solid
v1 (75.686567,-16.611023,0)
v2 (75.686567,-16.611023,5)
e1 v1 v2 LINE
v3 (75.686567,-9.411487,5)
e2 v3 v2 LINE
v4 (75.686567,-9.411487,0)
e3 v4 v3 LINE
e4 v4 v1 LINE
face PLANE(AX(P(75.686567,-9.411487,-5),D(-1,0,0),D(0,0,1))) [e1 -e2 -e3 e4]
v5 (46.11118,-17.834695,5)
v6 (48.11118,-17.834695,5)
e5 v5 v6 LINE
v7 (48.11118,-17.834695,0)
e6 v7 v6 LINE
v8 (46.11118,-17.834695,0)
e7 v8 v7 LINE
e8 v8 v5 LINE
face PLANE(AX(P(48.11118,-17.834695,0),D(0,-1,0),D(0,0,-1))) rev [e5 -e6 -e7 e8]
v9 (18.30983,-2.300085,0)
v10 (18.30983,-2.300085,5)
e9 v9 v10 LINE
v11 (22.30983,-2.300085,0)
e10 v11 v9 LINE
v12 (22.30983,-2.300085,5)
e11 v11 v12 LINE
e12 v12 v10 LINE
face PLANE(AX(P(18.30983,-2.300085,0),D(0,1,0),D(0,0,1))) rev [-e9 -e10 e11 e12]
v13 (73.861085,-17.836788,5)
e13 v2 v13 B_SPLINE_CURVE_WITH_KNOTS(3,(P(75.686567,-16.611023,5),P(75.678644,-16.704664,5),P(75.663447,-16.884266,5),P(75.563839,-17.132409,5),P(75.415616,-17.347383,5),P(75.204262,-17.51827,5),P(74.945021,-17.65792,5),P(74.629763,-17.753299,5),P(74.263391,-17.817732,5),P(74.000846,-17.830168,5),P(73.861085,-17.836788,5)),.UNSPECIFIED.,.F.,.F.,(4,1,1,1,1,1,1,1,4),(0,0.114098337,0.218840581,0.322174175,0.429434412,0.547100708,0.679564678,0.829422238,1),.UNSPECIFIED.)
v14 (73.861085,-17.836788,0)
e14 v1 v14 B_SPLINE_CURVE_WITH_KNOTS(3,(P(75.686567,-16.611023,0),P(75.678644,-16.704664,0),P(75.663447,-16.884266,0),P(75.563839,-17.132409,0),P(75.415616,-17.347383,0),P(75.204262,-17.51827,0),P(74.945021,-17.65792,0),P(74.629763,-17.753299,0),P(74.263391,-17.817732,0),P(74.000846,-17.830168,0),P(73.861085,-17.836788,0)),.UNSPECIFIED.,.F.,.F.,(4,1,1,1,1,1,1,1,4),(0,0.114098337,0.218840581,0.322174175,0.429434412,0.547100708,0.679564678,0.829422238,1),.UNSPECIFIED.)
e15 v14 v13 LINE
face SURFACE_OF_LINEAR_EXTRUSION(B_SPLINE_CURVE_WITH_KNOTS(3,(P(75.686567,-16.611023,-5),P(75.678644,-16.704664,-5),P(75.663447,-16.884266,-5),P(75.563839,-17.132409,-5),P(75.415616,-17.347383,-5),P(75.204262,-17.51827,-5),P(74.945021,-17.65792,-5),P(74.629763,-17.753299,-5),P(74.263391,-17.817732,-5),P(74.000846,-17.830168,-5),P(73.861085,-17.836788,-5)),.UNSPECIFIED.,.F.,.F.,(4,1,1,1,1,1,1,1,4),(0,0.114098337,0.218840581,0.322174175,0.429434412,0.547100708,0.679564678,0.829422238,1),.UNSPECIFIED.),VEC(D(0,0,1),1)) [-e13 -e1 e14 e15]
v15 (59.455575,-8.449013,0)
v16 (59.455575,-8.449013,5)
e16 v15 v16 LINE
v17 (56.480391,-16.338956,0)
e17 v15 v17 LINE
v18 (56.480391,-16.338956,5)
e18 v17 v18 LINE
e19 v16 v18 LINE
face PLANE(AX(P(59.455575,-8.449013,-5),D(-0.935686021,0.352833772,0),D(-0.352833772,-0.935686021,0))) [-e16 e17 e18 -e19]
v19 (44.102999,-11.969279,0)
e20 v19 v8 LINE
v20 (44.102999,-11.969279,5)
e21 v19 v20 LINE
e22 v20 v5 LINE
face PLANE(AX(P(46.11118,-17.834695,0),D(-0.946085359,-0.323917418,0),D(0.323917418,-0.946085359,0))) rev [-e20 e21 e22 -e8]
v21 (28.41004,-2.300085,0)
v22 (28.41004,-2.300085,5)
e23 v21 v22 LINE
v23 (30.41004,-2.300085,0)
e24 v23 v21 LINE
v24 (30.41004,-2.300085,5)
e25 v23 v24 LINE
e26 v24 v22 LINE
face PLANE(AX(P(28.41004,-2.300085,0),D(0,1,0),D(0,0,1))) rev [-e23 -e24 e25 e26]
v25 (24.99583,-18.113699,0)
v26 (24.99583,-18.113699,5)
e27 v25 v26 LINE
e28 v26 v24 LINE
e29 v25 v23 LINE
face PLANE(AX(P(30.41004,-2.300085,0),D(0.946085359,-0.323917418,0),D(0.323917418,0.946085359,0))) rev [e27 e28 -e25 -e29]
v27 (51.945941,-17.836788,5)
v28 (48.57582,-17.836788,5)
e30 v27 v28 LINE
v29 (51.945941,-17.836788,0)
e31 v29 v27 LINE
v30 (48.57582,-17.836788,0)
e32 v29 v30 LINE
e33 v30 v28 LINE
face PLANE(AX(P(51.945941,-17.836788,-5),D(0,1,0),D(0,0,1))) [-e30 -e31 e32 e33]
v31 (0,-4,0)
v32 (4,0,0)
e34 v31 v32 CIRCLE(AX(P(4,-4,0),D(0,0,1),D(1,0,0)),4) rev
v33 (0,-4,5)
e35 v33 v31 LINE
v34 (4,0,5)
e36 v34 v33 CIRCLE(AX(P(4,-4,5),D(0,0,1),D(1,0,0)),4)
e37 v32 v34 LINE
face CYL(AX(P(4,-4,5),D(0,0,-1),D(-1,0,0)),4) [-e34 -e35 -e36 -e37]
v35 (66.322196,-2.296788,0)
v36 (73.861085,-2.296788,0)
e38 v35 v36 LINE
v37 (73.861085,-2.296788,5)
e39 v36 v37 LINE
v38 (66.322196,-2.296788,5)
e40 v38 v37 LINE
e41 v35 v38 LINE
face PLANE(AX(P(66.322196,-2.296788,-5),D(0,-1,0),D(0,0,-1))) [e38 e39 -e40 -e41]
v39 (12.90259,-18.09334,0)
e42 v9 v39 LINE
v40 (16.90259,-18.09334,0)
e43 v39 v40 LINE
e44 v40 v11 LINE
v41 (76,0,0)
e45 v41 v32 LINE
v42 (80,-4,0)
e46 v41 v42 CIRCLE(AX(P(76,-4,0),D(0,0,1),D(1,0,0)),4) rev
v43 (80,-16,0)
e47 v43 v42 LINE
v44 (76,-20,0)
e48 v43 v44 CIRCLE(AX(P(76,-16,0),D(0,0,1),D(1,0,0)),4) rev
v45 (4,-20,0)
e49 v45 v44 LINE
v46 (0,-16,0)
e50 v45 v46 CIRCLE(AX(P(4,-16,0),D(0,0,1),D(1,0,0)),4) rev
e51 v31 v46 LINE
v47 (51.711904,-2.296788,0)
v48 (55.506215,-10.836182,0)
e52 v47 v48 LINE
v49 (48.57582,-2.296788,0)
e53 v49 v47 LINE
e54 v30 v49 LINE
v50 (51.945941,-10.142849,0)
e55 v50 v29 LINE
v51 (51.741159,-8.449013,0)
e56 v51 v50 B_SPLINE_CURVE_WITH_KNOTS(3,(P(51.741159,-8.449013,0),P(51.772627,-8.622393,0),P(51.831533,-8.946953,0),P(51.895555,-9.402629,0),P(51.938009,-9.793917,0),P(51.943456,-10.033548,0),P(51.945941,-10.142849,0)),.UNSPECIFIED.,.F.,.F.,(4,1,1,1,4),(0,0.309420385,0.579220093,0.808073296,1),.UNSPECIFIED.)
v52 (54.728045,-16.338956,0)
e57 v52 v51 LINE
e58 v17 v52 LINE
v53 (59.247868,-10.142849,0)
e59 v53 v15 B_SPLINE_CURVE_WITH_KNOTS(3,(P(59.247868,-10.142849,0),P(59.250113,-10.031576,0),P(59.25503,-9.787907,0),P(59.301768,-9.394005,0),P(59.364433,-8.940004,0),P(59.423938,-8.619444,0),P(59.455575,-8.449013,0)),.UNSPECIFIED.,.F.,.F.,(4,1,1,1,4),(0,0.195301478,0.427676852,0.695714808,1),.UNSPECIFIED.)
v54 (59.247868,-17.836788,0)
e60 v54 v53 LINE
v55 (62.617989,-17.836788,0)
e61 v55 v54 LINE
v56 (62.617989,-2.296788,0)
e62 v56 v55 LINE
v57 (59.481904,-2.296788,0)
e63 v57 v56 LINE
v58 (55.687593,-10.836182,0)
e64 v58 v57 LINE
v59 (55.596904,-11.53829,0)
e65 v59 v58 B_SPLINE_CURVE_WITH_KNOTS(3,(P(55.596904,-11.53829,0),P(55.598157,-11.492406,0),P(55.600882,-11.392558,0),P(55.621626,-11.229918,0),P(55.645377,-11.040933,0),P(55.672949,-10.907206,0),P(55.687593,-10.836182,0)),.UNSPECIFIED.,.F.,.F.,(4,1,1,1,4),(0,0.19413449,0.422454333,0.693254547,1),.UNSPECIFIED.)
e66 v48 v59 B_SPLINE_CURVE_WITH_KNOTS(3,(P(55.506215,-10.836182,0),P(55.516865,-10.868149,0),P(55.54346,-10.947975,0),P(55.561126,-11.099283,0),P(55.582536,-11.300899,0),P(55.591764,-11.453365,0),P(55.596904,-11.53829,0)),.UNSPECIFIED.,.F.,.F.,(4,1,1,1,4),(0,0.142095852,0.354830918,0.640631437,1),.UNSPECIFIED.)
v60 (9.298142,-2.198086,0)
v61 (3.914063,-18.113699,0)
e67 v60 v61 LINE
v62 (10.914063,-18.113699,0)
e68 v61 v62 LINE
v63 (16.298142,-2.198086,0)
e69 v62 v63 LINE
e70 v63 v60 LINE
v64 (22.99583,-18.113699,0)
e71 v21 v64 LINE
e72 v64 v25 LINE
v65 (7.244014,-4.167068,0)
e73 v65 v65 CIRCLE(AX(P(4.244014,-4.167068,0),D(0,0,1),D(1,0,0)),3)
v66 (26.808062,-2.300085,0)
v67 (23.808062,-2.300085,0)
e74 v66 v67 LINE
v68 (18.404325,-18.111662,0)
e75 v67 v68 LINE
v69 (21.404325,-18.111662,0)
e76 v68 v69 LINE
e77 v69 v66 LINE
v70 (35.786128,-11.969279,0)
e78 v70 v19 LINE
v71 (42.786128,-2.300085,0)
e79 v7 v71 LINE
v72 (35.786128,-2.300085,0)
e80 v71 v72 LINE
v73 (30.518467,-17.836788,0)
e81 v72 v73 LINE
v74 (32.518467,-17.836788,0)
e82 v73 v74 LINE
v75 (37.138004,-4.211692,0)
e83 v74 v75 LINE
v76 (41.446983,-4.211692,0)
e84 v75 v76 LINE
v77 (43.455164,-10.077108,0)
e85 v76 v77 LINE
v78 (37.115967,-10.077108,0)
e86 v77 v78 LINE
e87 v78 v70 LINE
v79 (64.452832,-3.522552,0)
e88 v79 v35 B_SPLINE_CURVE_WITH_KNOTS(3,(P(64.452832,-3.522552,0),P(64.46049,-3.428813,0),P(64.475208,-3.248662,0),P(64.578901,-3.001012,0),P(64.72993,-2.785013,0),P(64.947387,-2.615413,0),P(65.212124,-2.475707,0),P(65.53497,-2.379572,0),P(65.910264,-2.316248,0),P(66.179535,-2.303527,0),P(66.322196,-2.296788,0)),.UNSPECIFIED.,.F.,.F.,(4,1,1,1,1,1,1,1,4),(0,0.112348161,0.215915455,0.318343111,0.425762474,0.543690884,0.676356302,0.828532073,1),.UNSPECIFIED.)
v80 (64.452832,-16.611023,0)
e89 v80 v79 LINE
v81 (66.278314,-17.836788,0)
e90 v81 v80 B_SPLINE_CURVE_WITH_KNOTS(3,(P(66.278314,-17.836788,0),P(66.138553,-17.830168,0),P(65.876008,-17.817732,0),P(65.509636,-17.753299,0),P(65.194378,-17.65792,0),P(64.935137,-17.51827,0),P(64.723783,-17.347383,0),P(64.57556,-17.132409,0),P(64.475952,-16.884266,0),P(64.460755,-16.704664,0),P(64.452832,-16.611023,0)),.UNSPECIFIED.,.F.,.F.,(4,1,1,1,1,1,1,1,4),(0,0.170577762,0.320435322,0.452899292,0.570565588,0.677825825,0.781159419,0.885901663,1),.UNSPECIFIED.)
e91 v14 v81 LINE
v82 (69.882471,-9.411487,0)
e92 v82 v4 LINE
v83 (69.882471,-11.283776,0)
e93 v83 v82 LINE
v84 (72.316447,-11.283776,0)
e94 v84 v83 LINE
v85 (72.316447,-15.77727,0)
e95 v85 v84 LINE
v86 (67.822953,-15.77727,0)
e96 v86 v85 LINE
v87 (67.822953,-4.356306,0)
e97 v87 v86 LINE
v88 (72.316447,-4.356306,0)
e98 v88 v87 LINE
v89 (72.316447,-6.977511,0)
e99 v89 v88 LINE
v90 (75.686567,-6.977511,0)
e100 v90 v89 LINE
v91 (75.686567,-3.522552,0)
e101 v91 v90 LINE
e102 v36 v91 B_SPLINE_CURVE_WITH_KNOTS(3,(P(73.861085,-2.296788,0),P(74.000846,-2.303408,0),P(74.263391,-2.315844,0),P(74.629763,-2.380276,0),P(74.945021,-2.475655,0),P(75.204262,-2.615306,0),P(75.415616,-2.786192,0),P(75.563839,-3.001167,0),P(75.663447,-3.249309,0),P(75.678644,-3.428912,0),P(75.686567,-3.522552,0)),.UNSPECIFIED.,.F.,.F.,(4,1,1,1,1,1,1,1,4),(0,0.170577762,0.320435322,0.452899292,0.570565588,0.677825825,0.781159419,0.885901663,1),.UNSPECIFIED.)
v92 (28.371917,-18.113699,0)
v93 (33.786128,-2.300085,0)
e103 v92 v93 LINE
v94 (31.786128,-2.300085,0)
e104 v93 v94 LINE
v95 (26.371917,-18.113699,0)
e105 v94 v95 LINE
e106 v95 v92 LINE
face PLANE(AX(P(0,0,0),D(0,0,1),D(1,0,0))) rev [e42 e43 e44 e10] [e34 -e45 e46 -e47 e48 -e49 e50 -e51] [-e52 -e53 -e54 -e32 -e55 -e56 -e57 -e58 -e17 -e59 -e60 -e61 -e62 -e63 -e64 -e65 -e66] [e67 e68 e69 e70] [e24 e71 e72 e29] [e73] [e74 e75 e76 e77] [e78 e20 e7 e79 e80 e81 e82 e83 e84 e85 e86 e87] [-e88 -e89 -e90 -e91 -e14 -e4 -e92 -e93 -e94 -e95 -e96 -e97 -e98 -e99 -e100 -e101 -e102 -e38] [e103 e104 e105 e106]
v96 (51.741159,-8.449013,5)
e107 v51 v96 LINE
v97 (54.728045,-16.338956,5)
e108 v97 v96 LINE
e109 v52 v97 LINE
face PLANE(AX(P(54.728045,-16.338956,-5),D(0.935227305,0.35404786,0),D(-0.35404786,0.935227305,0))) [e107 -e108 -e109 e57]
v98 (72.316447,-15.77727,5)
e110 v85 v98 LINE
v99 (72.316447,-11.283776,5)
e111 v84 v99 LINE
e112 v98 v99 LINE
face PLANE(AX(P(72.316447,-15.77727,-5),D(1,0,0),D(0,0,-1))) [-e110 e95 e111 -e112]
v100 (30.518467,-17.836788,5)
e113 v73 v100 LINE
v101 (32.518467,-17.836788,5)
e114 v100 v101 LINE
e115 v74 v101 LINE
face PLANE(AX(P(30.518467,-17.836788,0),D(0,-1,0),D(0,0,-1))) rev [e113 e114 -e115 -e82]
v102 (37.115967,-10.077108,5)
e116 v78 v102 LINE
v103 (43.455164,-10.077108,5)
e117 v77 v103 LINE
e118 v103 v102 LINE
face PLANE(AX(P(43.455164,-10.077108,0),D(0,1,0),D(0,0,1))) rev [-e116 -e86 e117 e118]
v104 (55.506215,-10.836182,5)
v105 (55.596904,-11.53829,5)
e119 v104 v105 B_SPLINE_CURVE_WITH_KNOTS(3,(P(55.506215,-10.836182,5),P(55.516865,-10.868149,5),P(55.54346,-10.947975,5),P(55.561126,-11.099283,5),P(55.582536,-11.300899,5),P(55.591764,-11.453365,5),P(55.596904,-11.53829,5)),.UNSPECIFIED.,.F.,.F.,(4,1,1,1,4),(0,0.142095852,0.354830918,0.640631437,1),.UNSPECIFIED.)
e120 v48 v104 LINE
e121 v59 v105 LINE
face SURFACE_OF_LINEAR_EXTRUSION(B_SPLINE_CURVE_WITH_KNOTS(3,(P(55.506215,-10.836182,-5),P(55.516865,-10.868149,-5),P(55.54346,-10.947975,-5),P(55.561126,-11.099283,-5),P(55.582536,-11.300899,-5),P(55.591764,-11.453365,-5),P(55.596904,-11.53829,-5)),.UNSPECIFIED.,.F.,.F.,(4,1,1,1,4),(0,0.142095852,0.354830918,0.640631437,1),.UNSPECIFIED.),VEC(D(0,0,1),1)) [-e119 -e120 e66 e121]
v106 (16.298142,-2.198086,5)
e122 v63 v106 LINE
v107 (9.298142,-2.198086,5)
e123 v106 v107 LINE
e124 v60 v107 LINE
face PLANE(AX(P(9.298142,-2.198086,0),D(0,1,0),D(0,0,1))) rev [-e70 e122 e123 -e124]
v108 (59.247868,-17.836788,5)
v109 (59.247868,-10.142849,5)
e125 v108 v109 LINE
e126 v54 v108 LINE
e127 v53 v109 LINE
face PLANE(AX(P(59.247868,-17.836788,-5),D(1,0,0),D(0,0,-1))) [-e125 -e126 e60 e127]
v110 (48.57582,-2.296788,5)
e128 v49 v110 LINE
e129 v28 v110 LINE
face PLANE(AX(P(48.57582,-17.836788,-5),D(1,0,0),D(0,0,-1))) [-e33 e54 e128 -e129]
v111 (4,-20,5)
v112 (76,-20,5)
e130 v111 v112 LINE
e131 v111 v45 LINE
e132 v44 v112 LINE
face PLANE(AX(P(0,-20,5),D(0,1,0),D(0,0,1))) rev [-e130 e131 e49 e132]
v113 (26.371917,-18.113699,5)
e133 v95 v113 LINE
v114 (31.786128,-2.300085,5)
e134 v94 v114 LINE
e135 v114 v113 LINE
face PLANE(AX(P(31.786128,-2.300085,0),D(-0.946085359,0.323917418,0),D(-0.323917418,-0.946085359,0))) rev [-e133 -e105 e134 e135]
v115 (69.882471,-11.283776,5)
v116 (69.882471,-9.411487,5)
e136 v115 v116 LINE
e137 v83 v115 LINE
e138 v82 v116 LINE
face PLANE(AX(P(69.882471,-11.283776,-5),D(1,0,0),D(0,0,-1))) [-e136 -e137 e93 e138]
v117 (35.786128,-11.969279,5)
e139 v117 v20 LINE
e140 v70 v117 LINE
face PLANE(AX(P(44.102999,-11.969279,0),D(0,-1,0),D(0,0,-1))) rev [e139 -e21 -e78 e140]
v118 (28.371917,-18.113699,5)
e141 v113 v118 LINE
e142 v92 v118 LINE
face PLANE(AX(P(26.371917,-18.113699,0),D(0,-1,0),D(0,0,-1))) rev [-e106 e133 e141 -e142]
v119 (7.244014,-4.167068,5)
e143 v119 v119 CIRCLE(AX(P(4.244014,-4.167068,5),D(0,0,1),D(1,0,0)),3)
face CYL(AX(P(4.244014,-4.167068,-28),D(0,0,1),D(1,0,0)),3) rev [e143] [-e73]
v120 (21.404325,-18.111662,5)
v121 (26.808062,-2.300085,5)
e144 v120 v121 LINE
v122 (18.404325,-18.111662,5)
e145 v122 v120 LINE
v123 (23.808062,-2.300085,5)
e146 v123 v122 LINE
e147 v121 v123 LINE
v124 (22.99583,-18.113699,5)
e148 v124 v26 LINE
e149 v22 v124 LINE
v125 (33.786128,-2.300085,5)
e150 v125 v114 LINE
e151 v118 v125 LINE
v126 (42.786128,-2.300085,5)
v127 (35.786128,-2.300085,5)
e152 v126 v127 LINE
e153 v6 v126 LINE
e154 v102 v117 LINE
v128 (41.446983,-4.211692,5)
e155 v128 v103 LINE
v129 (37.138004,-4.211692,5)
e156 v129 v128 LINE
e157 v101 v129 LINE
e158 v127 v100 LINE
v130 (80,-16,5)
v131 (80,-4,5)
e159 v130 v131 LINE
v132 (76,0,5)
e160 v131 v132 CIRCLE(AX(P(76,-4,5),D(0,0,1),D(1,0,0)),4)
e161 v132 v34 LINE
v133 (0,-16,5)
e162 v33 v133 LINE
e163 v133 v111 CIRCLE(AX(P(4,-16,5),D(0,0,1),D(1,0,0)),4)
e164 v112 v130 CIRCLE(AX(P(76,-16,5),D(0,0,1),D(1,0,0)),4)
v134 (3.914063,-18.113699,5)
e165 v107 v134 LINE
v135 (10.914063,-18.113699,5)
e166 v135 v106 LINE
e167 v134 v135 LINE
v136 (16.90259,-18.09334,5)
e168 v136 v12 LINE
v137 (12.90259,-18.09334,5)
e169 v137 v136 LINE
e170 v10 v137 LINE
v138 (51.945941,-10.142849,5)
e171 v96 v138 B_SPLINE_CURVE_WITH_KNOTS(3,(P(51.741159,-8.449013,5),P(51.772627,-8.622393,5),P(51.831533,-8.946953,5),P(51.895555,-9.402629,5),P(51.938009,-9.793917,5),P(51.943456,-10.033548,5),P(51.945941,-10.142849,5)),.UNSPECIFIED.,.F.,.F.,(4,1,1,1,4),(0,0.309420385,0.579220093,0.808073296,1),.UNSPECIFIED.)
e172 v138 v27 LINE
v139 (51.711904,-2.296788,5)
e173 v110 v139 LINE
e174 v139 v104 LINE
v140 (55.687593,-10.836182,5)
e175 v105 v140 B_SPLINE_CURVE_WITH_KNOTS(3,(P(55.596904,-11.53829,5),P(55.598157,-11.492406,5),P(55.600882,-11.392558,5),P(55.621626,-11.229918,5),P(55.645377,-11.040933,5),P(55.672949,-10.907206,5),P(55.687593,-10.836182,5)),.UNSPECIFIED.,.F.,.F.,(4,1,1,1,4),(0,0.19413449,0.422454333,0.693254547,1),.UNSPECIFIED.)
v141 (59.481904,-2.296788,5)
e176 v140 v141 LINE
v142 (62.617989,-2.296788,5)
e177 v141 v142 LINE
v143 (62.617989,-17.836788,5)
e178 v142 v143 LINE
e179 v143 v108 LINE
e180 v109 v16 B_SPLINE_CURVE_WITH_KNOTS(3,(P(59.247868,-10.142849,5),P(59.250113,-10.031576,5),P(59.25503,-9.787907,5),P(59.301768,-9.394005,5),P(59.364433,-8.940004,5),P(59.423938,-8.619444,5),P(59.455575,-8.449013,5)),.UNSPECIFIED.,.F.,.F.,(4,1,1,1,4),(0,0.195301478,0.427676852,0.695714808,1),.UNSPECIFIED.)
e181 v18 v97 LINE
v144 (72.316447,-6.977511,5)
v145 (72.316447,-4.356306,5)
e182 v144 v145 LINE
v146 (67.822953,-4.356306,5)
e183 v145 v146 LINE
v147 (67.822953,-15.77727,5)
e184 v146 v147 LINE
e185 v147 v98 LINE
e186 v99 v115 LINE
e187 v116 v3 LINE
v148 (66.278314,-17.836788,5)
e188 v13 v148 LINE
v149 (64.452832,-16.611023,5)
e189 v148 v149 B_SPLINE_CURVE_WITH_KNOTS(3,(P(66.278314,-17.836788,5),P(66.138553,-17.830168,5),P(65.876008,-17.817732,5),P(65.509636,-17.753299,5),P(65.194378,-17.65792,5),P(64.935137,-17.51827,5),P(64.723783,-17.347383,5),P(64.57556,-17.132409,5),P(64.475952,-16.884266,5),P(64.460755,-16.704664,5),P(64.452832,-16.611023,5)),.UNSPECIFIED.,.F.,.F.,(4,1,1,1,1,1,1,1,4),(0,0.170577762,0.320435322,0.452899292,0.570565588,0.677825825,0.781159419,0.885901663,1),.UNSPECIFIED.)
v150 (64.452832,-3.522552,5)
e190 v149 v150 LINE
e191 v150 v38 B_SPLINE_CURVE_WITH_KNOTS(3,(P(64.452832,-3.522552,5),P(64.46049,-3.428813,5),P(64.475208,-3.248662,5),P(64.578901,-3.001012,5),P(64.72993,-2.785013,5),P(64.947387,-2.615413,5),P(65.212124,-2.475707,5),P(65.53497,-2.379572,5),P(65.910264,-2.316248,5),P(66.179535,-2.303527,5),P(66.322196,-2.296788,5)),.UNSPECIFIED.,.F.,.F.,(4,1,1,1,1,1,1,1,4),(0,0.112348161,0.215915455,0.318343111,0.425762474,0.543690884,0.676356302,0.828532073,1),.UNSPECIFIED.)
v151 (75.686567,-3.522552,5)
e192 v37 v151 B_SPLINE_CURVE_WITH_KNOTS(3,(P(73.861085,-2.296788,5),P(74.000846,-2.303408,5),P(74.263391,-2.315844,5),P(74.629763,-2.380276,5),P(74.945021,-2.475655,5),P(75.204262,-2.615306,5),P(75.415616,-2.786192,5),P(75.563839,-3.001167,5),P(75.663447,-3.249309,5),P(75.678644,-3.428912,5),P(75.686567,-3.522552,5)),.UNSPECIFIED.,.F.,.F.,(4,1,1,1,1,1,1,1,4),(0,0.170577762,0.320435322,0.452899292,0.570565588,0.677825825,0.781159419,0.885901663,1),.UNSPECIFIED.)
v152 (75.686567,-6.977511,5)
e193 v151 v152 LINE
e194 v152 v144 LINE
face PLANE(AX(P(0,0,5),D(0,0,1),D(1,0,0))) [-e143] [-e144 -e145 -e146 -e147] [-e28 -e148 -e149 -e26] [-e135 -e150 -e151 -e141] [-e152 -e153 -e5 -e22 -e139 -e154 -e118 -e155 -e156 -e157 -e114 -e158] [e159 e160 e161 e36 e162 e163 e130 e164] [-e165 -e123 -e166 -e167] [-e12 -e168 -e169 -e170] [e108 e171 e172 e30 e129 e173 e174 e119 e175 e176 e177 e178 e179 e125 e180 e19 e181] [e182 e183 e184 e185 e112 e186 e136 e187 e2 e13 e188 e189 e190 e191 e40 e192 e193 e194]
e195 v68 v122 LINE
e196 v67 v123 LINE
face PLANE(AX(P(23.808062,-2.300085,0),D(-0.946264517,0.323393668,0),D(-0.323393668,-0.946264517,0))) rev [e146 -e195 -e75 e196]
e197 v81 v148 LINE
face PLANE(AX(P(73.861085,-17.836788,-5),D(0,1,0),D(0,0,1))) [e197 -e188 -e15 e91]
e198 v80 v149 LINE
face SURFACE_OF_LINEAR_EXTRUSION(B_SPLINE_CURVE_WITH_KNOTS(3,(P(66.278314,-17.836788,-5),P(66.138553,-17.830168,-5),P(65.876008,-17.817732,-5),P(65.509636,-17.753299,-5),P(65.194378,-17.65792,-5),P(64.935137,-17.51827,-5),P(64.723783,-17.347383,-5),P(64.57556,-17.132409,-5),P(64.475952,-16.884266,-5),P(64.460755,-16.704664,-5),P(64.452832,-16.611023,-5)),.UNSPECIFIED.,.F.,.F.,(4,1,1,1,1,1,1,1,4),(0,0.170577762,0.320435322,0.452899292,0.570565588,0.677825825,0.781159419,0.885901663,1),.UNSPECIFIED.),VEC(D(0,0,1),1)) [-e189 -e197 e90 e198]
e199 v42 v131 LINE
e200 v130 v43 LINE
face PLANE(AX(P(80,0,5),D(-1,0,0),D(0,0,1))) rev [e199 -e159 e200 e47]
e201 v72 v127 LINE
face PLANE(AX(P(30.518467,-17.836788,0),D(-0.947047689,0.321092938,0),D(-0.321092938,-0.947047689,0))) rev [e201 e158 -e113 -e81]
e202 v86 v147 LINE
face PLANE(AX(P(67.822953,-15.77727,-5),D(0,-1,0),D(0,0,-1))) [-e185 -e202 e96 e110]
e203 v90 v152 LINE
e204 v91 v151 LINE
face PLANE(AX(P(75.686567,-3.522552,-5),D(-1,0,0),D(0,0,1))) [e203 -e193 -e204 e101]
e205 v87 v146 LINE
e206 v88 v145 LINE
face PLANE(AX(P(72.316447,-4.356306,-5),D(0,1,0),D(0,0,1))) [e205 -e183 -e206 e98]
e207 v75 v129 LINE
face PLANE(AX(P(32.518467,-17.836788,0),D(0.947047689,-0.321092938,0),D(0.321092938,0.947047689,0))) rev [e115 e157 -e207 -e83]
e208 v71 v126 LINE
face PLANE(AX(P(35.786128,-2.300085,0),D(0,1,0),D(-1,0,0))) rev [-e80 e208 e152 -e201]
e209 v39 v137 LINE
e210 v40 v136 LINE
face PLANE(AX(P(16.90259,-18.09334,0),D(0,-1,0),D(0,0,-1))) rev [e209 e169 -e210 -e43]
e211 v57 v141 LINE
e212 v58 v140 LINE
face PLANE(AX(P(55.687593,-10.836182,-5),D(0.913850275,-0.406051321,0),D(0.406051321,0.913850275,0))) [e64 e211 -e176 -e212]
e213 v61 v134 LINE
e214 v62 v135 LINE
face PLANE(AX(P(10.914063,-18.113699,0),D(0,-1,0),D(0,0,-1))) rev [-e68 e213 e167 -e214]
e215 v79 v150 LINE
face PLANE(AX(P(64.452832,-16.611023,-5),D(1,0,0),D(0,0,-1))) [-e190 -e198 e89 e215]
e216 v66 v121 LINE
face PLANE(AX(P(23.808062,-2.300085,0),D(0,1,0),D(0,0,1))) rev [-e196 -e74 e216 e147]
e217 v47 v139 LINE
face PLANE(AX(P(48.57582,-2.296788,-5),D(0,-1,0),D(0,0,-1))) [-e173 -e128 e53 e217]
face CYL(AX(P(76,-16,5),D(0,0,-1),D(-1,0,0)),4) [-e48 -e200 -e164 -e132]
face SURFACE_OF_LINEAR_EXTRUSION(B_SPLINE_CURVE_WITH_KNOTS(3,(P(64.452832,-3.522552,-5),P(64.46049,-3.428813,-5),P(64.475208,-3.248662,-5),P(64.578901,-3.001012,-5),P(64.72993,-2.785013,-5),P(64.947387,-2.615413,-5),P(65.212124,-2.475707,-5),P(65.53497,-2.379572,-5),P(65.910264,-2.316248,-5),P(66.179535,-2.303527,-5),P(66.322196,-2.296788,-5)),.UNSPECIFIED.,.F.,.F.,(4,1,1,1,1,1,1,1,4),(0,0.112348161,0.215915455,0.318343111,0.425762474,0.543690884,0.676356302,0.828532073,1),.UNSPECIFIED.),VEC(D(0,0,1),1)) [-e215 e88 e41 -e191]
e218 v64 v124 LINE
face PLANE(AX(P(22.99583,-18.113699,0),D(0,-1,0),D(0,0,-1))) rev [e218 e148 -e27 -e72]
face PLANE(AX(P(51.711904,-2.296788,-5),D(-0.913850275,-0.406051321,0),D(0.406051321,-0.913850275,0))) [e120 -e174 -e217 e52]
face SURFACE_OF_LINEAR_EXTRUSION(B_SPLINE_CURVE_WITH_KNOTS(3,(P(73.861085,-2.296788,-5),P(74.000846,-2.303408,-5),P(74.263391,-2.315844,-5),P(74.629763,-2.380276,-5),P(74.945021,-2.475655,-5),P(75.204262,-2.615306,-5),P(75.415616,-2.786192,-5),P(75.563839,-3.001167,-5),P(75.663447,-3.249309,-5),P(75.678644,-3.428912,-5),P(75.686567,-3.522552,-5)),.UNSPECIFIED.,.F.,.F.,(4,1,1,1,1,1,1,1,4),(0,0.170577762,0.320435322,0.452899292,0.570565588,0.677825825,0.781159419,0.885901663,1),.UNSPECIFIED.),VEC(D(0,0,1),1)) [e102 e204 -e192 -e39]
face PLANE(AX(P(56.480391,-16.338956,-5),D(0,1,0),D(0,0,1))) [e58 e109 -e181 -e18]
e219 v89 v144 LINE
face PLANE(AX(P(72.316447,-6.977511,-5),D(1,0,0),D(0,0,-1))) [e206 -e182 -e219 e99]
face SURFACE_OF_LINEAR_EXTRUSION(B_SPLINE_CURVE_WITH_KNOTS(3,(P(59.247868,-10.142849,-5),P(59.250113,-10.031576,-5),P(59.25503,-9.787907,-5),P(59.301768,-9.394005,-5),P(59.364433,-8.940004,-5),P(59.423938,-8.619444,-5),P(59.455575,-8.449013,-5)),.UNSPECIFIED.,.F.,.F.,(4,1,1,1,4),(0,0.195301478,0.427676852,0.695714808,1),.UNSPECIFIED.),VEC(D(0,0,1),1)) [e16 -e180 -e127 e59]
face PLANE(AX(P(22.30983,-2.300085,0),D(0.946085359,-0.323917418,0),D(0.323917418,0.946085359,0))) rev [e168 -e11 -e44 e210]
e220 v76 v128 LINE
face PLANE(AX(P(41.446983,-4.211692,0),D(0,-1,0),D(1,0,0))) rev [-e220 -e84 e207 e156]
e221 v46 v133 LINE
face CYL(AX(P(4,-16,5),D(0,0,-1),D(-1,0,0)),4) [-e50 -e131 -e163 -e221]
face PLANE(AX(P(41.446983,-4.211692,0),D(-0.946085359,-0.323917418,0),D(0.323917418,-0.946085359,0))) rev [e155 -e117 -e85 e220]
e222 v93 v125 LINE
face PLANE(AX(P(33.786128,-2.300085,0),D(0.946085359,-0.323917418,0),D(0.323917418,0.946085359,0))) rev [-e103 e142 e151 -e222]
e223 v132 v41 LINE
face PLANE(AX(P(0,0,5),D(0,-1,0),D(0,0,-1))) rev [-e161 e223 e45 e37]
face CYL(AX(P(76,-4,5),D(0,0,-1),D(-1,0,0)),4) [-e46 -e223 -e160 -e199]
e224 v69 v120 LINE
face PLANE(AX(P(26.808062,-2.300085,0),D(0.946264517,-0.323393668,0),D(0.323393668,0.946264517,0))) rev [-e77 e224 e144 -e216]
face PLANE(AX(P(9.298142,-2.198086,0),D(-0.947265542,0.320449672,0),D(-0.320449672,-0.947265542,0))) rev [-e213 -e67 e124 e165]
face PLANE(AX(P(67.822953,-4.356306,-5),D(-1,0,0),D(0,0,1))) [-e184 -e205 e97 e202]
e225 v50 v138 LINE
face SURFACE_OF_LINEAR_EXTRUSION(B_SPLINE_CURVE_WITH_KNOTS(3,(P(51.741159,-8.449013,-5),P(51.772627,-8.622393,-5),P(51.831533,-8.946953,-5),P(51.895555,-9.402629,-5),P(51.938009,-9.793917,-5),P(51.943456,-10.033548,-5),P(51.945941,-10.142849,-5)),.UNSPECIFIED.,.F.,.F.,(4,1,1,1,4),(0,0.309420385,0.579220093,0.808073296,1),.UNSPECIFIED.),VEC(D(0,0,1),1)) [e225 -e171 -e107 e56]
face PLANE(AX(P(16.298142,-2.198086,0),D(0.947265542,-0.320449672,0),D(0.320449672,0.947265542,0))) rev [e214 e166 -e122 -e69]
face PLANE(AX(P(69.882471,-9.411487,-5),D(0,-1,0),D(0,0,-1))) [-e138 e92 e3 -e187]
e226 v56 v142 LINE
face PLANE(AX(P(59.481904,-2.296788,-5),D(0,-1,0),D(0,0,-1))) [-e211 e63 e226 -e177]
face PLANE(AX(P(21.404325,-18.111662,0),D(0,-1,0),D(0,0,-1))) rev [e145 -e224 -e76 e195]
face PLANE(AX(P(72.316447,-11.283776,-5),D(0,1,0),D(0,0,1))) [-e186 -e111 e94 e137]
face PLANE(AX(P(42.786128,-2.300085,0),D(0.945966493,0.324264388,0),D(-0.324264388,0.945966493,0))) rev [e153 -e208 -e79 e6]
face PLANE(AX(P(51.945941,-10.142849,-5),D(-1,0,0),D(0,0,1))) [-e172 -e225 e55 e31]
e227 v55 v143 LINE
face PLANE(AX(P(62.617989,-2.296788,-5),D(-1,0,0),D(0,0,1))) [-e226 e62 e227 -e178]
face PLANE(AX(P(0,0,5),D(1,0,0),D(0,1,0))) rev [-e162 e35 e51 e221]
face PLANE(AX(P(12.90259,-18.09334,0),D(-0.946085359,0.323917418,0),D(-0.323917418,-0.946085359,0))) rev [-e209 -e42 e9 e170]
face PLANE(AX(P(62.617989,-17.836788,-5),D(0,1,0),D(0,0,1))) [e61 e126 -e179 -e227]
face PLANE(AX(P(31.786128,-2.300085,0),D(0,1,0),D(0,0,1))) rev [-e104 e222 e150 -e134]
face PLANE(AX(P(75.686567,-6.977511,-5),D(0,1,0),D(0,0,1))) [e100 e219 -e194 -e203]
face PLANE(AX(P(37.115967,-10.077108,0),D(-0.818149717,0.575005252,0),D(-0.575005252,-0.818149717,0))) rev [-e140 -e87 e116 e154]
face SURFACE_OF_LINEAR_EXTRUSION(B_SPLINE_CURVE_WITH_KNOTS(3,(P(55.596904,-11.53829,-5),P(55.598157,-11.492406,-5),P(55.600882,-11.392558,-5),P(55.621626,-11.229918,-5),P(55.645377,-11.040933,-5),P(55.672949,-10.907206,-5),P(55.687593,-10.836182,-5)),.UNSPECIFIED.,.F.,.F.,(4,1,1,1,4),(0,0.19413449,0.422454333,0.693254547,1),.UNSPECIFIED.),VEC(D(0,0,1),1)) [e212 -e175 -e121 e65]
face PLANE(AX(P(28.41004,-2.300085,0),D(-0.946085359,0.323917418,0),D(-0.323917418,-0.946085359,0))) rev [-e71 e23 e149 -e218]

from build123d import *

# Parameters (mm, degrees)
ESQUISSE1_W                  = 80
ESQUISSE1_H                  = 20
BOSS_EXTRU_1_DEPTH           = 5
CONG_1_R                     = 4
ENL_V_MAT_EXTRU_1_DEPTH      = 83.613558209
ENL_V_START                  = -5
ENL_V_MAT_EXTRU_2_DEPTH      = 5
ESQUISSE11_W                 = 13.611032385
ESQUISSE11_H                 = 17.64061434
BOSS_EXTRU_8_DEPTH           = 5
ENL_V_MAT_EXTRU_3_DEPTH      = 83.613558336
ENL_V_MAT_EXTRU_3_DEPTH_BACK = 83.613558336
ESQUISSE13_R                 = 3
ENL_V_MAT_EXTRU_4_DEPTH      = 33


# Read off the part's stored shape, not the designer's step: Enlèv. mat.-Extru.2
with BuildPart() as part:
    # Esquisse1 → Boss.-Extru.1 (new body)
    with BuildSketch(Plane.XY):
        with Locations((40, -10)):
            Rectangle(ESQUISSE1_W, ESQUISSE1_H)
    extrude(amount=BOSS_EXTRU_1_DEPTH)

    # Congé1
    cong_1_edges = [part.edges().sort_by_distance(p)[0] for p in [
        (0, 0, 2.5),
        (80, 0, 2.5),
        (80, -20, 2.5),
        (0, -20, 2.5),
    ]]
    fillet(cong_1_edges, radius=CONG_1_R)

    # Esquisse2 → Enlèv. mat.-Extru.1 (cut, through all)
    with BuildSketch(Plane.XY.offset(5)):
        Polygon((28.410040172, -2.300084773), (30.410040172, -2.300084773), (24.995829866, -18.113699025), (22.995829866, -18.113699025), align=None)
        Polygon((9.298142424, -2.198086037), (16.298142424, -2.198086037), (10.914062948, -18.113699025), (3.914062948, -18.113699025), align=None)
        Polygon((18.309829725, -2.300084773), (22.309829725, -2.300084773), (16.902589817, -18.093340154), (12.902589817, -18.093340154), align=None)
        Polygon((23.808061727, -2.300084773), (26.808061727, -2.300084773), (21.404325417, -18.111661936), (18.404325417, -18.111661936), align=None)
        Polygon((31.786127586, -2.300084773), (33.786127586, -2.300084773), (28.371917279, -18.113699025), (26.371917279, -18.113699025), align=None)
    extrude(amount=-ENL_V_MAT_EXTRU_1_DEPTH, mode=Mode.SUBTRACT)

    # Enlèv. mat.-Extru.2 outline → Enlèv. mat.-Extru.2 (cut)
    # profile 1 of 3: a face of its own
    with BuildSketch(Plane.XY.offset(5).offset(ENL_V_START)):
        with BuildLine():
            add(Edge.make_bspline(
                [(75.686567024, -16.611023442), (75.678643784, -16.704663886), (75.663447013, -16.884266233), (75.563839443, -17.132408637), (75.415616385, -17.347383223), (75.204262037, -17.518269705), (74.945020643, -17.657920052), (74.629763147, -17.753299102), (74.263391467, -17.817731699), (74.000846179, -17.830167685), (73.861085096, -17.83678775)],
                knots=[0, 0, 0, 0, 0.114098337, 0.218840581, 0.322174175, 0.429434412, 0.547100708, 0.679564678, 0.829422238, 1, 1, 1, 1], degree=3))
            Line((75.686567024, -16.611023442), (75.686567024, -9.411486545))
            Line((75.686567024, -9.411486545), (69.882470639, -9.411486545))
            Line((69.882470639, -9.411486545), (69.882470639, -11.283775701))
            Line((69.882470639, -11.283775701), (72.316446542, -11.283775701))
            Line((72.316446542, -11.283775701), (72.316446542, -15.777269677))
            Line((72.316446542, -15.777269677), (67.822952566, -15.777269677))
            Line((67.822952566, -15.777269677), (67.822952566, -4.356305822))
            Line((67.822952566, -4.356305822), (72.316446542, -4.356305822))
            Line((72.316446542, -4.356305822), (72.316446542, -6.977510641))
            Line((72.316446542, -6.977510641), (75.686567024, -6.977510641))
            Line((75.686567024, -6.977510641), (75.686567024, -3.522552057))
            add(Edge.make_bspline(
                [(73.861085096, -2.29678775), (74.000846179, -2.303407815), (74.263391467, -2.3158438), (74.629763147, -2.380276397), (74.945020643, -2.475655447), (75.204262037, -2.615305794), (75.415616385, -2.786192276), (75.563839443, -3.001166862), (75.663447013, -3.249309266), (75.678643784, -3.428911613), (75.686567024, -3.522552057)],
                knots=[0, 0, 0, 0, 0.170577762, 0.320435322, 0.452899292, 0.570565588, 0.677825825, 0.781159419, 0.885901663, 1, 1, 1, 1], degree=3))
            Line((73.861085096, -2.29678775), (66.322195789, -2.29678775))
            add(Edge.make_bspline(
                [(64.452832084, -3.522552057), (64.460490101, -3.428813179), (64.475207603, -3.248661832), (64.578900626, -3.001012416), (64.72992953, -2.785012839), (64.947387079, -2.615412784), (65.212124175, -2.475706721), (65.534969931, -2.379572165), (65.910264022, -2.316247539), (66.179534857, -2.303527098), (66.322195789, -2.29678775)],
                knots=[0, 0, 0, 0, 0.112348161, 0.215915455, 0.318343111, 0.425762474, 0.543690884, 0.676356302, 0.828532073, 1, 1, 1, 1], degree=3))
            Line((64.452832084, -3.522552057), (64.452832084, -16.611023442))
            add(Edge.make_bspline(
                [(66.278314012, -17.83678775), (66.138552929, -17.830167685), (65.876007642, -17.817731699), (65.509635961, -17.753299102), (65.194378466, -17.657920052), (64.935137072, -17.518269705), (64.723782723, -17.347383223), (64.575559665, -17.132408637), (64.475952096, -16.884266233), (64.460755324, -16.704663886), (64.452832084, -16.611023442)],
                knots=[0, 0, 0, 0, 0.170577762, 0.320435322, 0.452899292, 0.570565588, 0.677825825, 0.781159419, 0.885901663, 1, 1, 1, 1], degree=3))
            Line((66.278314012, -17.83678775), (73.861085096, -17.83678775))
        make_face()
    # profile 2 of 3: a face of its own
    with BuildSketch(Plane.XY.offset(5).offset(ENL_V_START)):
        with BuildLine():
            add(Edge.make_bspline(
                [(59.247868229, -10.142849497), (59.250113416, -10.031576234), (59.255029992, -9.787906808), (59.301768342, -9.394005261), (59.364432817, -8.9400039), (59.423938248, -8.619443962), (59.455575307, -8.4490129)],
                knots=[0, 0, 0, 0, 0.195301478, 0.427676852, 0.695714808, 1, 1, 1, 1], degree=3))
            Line((59.247868229, -10.142849497), (59.247868229, -17.83678775))
            Line((59.247868229, -17.83678775), (62.617988711, -17.83678775))
            Line((62.617988711, -17.83678775), (62.617988711, -2.29678775))
            Line((62.617988711, -2.29678775), (59.481904374, -2.29678775))
            Line((59.481904374, -2.29678775), (55.68759338, -10.836181575))
            add(Edge.make_bspline(
                [(55.596904374, -11.538290009), (55.59815665, -11.492405908), (55.600881716, -11.392557927), (55.62162629, -11.229918497), (55.645376833, -11.040932864), (55.672949182, -10.907206292), (55.68759338, -10.836181575)],
                knots=[0, 0, 0, 0, 0.19413449, 0.422454333, 0.693254547, 1, 1, 1, 1], degree=3))
            add(Edge.make_bspline(
                [(55.506215368, -10.836181575), (55.516865461, -10.868148772), (55.54346006, -10.947974815), (55.561126156, -11.099283482), (55.582536457, -11.300899182), (55.59176432, -11.45336457), (55.596904374, -11.538290009)],
                knots=[0, 0, 0, 0, 0.142095852, 0.354830918, 0.640631437, 1, 1, 1, 1], degree=3))
            Line((55.506215368, -10.836181575), (51.711904374, -2.29678775))
            Line((51.711904374, -2.29678775), (48.575820036, -2.29678775))
            Line((48.575820036, -2.29678775), (48.575820036, -17.83678775))
            Line((48.575820036, -17.83678775), (51.945940518, -17.83678775))
            Line((51.945940518, -17.83678775), (51.945940518, -10.142849497))
            add(Edge.make_bspline(
                [(51.741158892, -8.4490129), (51.77262663, -8.62239324), (51.831532725, -8.946952903), (51.895555168, -9.402629403), (51.938009232, -9.793916754), (51.94345609, -10.033548389), (51.945940518, -10.142849497)],
                knots=[0, 0, 0, 0, 0.309420385, 0.579220093, 0.808073296, 1, 1, 1, 1], degree=3))
            Line((51.741158892, -8.4490129), (54.728045187, -16.338956424))
            Line((54.728045187, -16.338956424), (56.480390819, -16.338956424))
            Line((56.480390819, -16.338956424), (59.455575307, -8.4490129))
        make_face()
    # profile 3 of 3: a face of its own
    with BuildSketch(Plane.XY.offset(5).offset(ENL_V_START)):
        Polygon((44.119771843, -17.83678775), (47.489892325, -17.83678775), (43.019801964, -2.29678775), (39.439048952, -2.29678775), (34.945554976, -17.795831424), (34.945554976, -17.83678775), (38.315675458, -17.83678775), (39.023634795, -15.028354015), (43.41766341, -15.028354015), align=None)
        Polygon((41.217723651, -5.921422539), (42.923262054, -12.968835942), (39.488781633, -12.968835942), align=None, mode=Mode.SUBTRACT)
    extrude(amount=ENL_V_MAT_EXTRU_2_DEPTH, mode=Mode.SUBTRACT)

    # Esquisse11 → Boss.-Extru.8 (add)
    with BuildSketch(Plane.XY.offset(5)):
        with Locations((41.097921838, -10.121676789)):
            Rectangle(ESQUISSE11_W, ESQUISSE11_H)
    extrude(amount=-BOSS_EXTRU_8_DEPTH)

    # Esquisse12 → Enlèv. mat.-Extru.3 (cut, two sides: drawn at the far end of the back side and taken through both)
    with BuildSketch(Plane.XY.offset(5).offset(-ENL_V_MAT_EXTRU_3_DEPTH_BACK)):
        Polygon((35.786127586, -2.300084773), (42.786127586, -2.300084773), (48.111179633, -17.834694794), (46.111179633, -17.834694794), (44.102998893, -11.969278829), (35.786127586, -11.969278829), (37.115967439, -10.077108111), (43.455164056, -10.077108111), (41.446983316, -4.211692145), (37.138004335, -4.211692145), (32.518467193, -17.83678775), (30.518467193, -17.83678775), align=None)
    extrude(amount=ENL_V_MAT_EXTRU_3_DEPTH + ENL_V_MAT_EXTRU_3_DEPTH_BACK, mode=Mode.SUBTRACT)

    # Esquisse13 → Enlèv. mat.-Extru.4 (cut)
    with BuildSketch(Plane.XY.offset(5)):
        with Locations((4.24401363, -4.167068495)):
            Circle(ESQUISSE13_R)
    extrude(amount=-ENL_V_MAT_EXTRU_4_DEPTH, mode=Mode.SUBTRACT)


solid = part.part
